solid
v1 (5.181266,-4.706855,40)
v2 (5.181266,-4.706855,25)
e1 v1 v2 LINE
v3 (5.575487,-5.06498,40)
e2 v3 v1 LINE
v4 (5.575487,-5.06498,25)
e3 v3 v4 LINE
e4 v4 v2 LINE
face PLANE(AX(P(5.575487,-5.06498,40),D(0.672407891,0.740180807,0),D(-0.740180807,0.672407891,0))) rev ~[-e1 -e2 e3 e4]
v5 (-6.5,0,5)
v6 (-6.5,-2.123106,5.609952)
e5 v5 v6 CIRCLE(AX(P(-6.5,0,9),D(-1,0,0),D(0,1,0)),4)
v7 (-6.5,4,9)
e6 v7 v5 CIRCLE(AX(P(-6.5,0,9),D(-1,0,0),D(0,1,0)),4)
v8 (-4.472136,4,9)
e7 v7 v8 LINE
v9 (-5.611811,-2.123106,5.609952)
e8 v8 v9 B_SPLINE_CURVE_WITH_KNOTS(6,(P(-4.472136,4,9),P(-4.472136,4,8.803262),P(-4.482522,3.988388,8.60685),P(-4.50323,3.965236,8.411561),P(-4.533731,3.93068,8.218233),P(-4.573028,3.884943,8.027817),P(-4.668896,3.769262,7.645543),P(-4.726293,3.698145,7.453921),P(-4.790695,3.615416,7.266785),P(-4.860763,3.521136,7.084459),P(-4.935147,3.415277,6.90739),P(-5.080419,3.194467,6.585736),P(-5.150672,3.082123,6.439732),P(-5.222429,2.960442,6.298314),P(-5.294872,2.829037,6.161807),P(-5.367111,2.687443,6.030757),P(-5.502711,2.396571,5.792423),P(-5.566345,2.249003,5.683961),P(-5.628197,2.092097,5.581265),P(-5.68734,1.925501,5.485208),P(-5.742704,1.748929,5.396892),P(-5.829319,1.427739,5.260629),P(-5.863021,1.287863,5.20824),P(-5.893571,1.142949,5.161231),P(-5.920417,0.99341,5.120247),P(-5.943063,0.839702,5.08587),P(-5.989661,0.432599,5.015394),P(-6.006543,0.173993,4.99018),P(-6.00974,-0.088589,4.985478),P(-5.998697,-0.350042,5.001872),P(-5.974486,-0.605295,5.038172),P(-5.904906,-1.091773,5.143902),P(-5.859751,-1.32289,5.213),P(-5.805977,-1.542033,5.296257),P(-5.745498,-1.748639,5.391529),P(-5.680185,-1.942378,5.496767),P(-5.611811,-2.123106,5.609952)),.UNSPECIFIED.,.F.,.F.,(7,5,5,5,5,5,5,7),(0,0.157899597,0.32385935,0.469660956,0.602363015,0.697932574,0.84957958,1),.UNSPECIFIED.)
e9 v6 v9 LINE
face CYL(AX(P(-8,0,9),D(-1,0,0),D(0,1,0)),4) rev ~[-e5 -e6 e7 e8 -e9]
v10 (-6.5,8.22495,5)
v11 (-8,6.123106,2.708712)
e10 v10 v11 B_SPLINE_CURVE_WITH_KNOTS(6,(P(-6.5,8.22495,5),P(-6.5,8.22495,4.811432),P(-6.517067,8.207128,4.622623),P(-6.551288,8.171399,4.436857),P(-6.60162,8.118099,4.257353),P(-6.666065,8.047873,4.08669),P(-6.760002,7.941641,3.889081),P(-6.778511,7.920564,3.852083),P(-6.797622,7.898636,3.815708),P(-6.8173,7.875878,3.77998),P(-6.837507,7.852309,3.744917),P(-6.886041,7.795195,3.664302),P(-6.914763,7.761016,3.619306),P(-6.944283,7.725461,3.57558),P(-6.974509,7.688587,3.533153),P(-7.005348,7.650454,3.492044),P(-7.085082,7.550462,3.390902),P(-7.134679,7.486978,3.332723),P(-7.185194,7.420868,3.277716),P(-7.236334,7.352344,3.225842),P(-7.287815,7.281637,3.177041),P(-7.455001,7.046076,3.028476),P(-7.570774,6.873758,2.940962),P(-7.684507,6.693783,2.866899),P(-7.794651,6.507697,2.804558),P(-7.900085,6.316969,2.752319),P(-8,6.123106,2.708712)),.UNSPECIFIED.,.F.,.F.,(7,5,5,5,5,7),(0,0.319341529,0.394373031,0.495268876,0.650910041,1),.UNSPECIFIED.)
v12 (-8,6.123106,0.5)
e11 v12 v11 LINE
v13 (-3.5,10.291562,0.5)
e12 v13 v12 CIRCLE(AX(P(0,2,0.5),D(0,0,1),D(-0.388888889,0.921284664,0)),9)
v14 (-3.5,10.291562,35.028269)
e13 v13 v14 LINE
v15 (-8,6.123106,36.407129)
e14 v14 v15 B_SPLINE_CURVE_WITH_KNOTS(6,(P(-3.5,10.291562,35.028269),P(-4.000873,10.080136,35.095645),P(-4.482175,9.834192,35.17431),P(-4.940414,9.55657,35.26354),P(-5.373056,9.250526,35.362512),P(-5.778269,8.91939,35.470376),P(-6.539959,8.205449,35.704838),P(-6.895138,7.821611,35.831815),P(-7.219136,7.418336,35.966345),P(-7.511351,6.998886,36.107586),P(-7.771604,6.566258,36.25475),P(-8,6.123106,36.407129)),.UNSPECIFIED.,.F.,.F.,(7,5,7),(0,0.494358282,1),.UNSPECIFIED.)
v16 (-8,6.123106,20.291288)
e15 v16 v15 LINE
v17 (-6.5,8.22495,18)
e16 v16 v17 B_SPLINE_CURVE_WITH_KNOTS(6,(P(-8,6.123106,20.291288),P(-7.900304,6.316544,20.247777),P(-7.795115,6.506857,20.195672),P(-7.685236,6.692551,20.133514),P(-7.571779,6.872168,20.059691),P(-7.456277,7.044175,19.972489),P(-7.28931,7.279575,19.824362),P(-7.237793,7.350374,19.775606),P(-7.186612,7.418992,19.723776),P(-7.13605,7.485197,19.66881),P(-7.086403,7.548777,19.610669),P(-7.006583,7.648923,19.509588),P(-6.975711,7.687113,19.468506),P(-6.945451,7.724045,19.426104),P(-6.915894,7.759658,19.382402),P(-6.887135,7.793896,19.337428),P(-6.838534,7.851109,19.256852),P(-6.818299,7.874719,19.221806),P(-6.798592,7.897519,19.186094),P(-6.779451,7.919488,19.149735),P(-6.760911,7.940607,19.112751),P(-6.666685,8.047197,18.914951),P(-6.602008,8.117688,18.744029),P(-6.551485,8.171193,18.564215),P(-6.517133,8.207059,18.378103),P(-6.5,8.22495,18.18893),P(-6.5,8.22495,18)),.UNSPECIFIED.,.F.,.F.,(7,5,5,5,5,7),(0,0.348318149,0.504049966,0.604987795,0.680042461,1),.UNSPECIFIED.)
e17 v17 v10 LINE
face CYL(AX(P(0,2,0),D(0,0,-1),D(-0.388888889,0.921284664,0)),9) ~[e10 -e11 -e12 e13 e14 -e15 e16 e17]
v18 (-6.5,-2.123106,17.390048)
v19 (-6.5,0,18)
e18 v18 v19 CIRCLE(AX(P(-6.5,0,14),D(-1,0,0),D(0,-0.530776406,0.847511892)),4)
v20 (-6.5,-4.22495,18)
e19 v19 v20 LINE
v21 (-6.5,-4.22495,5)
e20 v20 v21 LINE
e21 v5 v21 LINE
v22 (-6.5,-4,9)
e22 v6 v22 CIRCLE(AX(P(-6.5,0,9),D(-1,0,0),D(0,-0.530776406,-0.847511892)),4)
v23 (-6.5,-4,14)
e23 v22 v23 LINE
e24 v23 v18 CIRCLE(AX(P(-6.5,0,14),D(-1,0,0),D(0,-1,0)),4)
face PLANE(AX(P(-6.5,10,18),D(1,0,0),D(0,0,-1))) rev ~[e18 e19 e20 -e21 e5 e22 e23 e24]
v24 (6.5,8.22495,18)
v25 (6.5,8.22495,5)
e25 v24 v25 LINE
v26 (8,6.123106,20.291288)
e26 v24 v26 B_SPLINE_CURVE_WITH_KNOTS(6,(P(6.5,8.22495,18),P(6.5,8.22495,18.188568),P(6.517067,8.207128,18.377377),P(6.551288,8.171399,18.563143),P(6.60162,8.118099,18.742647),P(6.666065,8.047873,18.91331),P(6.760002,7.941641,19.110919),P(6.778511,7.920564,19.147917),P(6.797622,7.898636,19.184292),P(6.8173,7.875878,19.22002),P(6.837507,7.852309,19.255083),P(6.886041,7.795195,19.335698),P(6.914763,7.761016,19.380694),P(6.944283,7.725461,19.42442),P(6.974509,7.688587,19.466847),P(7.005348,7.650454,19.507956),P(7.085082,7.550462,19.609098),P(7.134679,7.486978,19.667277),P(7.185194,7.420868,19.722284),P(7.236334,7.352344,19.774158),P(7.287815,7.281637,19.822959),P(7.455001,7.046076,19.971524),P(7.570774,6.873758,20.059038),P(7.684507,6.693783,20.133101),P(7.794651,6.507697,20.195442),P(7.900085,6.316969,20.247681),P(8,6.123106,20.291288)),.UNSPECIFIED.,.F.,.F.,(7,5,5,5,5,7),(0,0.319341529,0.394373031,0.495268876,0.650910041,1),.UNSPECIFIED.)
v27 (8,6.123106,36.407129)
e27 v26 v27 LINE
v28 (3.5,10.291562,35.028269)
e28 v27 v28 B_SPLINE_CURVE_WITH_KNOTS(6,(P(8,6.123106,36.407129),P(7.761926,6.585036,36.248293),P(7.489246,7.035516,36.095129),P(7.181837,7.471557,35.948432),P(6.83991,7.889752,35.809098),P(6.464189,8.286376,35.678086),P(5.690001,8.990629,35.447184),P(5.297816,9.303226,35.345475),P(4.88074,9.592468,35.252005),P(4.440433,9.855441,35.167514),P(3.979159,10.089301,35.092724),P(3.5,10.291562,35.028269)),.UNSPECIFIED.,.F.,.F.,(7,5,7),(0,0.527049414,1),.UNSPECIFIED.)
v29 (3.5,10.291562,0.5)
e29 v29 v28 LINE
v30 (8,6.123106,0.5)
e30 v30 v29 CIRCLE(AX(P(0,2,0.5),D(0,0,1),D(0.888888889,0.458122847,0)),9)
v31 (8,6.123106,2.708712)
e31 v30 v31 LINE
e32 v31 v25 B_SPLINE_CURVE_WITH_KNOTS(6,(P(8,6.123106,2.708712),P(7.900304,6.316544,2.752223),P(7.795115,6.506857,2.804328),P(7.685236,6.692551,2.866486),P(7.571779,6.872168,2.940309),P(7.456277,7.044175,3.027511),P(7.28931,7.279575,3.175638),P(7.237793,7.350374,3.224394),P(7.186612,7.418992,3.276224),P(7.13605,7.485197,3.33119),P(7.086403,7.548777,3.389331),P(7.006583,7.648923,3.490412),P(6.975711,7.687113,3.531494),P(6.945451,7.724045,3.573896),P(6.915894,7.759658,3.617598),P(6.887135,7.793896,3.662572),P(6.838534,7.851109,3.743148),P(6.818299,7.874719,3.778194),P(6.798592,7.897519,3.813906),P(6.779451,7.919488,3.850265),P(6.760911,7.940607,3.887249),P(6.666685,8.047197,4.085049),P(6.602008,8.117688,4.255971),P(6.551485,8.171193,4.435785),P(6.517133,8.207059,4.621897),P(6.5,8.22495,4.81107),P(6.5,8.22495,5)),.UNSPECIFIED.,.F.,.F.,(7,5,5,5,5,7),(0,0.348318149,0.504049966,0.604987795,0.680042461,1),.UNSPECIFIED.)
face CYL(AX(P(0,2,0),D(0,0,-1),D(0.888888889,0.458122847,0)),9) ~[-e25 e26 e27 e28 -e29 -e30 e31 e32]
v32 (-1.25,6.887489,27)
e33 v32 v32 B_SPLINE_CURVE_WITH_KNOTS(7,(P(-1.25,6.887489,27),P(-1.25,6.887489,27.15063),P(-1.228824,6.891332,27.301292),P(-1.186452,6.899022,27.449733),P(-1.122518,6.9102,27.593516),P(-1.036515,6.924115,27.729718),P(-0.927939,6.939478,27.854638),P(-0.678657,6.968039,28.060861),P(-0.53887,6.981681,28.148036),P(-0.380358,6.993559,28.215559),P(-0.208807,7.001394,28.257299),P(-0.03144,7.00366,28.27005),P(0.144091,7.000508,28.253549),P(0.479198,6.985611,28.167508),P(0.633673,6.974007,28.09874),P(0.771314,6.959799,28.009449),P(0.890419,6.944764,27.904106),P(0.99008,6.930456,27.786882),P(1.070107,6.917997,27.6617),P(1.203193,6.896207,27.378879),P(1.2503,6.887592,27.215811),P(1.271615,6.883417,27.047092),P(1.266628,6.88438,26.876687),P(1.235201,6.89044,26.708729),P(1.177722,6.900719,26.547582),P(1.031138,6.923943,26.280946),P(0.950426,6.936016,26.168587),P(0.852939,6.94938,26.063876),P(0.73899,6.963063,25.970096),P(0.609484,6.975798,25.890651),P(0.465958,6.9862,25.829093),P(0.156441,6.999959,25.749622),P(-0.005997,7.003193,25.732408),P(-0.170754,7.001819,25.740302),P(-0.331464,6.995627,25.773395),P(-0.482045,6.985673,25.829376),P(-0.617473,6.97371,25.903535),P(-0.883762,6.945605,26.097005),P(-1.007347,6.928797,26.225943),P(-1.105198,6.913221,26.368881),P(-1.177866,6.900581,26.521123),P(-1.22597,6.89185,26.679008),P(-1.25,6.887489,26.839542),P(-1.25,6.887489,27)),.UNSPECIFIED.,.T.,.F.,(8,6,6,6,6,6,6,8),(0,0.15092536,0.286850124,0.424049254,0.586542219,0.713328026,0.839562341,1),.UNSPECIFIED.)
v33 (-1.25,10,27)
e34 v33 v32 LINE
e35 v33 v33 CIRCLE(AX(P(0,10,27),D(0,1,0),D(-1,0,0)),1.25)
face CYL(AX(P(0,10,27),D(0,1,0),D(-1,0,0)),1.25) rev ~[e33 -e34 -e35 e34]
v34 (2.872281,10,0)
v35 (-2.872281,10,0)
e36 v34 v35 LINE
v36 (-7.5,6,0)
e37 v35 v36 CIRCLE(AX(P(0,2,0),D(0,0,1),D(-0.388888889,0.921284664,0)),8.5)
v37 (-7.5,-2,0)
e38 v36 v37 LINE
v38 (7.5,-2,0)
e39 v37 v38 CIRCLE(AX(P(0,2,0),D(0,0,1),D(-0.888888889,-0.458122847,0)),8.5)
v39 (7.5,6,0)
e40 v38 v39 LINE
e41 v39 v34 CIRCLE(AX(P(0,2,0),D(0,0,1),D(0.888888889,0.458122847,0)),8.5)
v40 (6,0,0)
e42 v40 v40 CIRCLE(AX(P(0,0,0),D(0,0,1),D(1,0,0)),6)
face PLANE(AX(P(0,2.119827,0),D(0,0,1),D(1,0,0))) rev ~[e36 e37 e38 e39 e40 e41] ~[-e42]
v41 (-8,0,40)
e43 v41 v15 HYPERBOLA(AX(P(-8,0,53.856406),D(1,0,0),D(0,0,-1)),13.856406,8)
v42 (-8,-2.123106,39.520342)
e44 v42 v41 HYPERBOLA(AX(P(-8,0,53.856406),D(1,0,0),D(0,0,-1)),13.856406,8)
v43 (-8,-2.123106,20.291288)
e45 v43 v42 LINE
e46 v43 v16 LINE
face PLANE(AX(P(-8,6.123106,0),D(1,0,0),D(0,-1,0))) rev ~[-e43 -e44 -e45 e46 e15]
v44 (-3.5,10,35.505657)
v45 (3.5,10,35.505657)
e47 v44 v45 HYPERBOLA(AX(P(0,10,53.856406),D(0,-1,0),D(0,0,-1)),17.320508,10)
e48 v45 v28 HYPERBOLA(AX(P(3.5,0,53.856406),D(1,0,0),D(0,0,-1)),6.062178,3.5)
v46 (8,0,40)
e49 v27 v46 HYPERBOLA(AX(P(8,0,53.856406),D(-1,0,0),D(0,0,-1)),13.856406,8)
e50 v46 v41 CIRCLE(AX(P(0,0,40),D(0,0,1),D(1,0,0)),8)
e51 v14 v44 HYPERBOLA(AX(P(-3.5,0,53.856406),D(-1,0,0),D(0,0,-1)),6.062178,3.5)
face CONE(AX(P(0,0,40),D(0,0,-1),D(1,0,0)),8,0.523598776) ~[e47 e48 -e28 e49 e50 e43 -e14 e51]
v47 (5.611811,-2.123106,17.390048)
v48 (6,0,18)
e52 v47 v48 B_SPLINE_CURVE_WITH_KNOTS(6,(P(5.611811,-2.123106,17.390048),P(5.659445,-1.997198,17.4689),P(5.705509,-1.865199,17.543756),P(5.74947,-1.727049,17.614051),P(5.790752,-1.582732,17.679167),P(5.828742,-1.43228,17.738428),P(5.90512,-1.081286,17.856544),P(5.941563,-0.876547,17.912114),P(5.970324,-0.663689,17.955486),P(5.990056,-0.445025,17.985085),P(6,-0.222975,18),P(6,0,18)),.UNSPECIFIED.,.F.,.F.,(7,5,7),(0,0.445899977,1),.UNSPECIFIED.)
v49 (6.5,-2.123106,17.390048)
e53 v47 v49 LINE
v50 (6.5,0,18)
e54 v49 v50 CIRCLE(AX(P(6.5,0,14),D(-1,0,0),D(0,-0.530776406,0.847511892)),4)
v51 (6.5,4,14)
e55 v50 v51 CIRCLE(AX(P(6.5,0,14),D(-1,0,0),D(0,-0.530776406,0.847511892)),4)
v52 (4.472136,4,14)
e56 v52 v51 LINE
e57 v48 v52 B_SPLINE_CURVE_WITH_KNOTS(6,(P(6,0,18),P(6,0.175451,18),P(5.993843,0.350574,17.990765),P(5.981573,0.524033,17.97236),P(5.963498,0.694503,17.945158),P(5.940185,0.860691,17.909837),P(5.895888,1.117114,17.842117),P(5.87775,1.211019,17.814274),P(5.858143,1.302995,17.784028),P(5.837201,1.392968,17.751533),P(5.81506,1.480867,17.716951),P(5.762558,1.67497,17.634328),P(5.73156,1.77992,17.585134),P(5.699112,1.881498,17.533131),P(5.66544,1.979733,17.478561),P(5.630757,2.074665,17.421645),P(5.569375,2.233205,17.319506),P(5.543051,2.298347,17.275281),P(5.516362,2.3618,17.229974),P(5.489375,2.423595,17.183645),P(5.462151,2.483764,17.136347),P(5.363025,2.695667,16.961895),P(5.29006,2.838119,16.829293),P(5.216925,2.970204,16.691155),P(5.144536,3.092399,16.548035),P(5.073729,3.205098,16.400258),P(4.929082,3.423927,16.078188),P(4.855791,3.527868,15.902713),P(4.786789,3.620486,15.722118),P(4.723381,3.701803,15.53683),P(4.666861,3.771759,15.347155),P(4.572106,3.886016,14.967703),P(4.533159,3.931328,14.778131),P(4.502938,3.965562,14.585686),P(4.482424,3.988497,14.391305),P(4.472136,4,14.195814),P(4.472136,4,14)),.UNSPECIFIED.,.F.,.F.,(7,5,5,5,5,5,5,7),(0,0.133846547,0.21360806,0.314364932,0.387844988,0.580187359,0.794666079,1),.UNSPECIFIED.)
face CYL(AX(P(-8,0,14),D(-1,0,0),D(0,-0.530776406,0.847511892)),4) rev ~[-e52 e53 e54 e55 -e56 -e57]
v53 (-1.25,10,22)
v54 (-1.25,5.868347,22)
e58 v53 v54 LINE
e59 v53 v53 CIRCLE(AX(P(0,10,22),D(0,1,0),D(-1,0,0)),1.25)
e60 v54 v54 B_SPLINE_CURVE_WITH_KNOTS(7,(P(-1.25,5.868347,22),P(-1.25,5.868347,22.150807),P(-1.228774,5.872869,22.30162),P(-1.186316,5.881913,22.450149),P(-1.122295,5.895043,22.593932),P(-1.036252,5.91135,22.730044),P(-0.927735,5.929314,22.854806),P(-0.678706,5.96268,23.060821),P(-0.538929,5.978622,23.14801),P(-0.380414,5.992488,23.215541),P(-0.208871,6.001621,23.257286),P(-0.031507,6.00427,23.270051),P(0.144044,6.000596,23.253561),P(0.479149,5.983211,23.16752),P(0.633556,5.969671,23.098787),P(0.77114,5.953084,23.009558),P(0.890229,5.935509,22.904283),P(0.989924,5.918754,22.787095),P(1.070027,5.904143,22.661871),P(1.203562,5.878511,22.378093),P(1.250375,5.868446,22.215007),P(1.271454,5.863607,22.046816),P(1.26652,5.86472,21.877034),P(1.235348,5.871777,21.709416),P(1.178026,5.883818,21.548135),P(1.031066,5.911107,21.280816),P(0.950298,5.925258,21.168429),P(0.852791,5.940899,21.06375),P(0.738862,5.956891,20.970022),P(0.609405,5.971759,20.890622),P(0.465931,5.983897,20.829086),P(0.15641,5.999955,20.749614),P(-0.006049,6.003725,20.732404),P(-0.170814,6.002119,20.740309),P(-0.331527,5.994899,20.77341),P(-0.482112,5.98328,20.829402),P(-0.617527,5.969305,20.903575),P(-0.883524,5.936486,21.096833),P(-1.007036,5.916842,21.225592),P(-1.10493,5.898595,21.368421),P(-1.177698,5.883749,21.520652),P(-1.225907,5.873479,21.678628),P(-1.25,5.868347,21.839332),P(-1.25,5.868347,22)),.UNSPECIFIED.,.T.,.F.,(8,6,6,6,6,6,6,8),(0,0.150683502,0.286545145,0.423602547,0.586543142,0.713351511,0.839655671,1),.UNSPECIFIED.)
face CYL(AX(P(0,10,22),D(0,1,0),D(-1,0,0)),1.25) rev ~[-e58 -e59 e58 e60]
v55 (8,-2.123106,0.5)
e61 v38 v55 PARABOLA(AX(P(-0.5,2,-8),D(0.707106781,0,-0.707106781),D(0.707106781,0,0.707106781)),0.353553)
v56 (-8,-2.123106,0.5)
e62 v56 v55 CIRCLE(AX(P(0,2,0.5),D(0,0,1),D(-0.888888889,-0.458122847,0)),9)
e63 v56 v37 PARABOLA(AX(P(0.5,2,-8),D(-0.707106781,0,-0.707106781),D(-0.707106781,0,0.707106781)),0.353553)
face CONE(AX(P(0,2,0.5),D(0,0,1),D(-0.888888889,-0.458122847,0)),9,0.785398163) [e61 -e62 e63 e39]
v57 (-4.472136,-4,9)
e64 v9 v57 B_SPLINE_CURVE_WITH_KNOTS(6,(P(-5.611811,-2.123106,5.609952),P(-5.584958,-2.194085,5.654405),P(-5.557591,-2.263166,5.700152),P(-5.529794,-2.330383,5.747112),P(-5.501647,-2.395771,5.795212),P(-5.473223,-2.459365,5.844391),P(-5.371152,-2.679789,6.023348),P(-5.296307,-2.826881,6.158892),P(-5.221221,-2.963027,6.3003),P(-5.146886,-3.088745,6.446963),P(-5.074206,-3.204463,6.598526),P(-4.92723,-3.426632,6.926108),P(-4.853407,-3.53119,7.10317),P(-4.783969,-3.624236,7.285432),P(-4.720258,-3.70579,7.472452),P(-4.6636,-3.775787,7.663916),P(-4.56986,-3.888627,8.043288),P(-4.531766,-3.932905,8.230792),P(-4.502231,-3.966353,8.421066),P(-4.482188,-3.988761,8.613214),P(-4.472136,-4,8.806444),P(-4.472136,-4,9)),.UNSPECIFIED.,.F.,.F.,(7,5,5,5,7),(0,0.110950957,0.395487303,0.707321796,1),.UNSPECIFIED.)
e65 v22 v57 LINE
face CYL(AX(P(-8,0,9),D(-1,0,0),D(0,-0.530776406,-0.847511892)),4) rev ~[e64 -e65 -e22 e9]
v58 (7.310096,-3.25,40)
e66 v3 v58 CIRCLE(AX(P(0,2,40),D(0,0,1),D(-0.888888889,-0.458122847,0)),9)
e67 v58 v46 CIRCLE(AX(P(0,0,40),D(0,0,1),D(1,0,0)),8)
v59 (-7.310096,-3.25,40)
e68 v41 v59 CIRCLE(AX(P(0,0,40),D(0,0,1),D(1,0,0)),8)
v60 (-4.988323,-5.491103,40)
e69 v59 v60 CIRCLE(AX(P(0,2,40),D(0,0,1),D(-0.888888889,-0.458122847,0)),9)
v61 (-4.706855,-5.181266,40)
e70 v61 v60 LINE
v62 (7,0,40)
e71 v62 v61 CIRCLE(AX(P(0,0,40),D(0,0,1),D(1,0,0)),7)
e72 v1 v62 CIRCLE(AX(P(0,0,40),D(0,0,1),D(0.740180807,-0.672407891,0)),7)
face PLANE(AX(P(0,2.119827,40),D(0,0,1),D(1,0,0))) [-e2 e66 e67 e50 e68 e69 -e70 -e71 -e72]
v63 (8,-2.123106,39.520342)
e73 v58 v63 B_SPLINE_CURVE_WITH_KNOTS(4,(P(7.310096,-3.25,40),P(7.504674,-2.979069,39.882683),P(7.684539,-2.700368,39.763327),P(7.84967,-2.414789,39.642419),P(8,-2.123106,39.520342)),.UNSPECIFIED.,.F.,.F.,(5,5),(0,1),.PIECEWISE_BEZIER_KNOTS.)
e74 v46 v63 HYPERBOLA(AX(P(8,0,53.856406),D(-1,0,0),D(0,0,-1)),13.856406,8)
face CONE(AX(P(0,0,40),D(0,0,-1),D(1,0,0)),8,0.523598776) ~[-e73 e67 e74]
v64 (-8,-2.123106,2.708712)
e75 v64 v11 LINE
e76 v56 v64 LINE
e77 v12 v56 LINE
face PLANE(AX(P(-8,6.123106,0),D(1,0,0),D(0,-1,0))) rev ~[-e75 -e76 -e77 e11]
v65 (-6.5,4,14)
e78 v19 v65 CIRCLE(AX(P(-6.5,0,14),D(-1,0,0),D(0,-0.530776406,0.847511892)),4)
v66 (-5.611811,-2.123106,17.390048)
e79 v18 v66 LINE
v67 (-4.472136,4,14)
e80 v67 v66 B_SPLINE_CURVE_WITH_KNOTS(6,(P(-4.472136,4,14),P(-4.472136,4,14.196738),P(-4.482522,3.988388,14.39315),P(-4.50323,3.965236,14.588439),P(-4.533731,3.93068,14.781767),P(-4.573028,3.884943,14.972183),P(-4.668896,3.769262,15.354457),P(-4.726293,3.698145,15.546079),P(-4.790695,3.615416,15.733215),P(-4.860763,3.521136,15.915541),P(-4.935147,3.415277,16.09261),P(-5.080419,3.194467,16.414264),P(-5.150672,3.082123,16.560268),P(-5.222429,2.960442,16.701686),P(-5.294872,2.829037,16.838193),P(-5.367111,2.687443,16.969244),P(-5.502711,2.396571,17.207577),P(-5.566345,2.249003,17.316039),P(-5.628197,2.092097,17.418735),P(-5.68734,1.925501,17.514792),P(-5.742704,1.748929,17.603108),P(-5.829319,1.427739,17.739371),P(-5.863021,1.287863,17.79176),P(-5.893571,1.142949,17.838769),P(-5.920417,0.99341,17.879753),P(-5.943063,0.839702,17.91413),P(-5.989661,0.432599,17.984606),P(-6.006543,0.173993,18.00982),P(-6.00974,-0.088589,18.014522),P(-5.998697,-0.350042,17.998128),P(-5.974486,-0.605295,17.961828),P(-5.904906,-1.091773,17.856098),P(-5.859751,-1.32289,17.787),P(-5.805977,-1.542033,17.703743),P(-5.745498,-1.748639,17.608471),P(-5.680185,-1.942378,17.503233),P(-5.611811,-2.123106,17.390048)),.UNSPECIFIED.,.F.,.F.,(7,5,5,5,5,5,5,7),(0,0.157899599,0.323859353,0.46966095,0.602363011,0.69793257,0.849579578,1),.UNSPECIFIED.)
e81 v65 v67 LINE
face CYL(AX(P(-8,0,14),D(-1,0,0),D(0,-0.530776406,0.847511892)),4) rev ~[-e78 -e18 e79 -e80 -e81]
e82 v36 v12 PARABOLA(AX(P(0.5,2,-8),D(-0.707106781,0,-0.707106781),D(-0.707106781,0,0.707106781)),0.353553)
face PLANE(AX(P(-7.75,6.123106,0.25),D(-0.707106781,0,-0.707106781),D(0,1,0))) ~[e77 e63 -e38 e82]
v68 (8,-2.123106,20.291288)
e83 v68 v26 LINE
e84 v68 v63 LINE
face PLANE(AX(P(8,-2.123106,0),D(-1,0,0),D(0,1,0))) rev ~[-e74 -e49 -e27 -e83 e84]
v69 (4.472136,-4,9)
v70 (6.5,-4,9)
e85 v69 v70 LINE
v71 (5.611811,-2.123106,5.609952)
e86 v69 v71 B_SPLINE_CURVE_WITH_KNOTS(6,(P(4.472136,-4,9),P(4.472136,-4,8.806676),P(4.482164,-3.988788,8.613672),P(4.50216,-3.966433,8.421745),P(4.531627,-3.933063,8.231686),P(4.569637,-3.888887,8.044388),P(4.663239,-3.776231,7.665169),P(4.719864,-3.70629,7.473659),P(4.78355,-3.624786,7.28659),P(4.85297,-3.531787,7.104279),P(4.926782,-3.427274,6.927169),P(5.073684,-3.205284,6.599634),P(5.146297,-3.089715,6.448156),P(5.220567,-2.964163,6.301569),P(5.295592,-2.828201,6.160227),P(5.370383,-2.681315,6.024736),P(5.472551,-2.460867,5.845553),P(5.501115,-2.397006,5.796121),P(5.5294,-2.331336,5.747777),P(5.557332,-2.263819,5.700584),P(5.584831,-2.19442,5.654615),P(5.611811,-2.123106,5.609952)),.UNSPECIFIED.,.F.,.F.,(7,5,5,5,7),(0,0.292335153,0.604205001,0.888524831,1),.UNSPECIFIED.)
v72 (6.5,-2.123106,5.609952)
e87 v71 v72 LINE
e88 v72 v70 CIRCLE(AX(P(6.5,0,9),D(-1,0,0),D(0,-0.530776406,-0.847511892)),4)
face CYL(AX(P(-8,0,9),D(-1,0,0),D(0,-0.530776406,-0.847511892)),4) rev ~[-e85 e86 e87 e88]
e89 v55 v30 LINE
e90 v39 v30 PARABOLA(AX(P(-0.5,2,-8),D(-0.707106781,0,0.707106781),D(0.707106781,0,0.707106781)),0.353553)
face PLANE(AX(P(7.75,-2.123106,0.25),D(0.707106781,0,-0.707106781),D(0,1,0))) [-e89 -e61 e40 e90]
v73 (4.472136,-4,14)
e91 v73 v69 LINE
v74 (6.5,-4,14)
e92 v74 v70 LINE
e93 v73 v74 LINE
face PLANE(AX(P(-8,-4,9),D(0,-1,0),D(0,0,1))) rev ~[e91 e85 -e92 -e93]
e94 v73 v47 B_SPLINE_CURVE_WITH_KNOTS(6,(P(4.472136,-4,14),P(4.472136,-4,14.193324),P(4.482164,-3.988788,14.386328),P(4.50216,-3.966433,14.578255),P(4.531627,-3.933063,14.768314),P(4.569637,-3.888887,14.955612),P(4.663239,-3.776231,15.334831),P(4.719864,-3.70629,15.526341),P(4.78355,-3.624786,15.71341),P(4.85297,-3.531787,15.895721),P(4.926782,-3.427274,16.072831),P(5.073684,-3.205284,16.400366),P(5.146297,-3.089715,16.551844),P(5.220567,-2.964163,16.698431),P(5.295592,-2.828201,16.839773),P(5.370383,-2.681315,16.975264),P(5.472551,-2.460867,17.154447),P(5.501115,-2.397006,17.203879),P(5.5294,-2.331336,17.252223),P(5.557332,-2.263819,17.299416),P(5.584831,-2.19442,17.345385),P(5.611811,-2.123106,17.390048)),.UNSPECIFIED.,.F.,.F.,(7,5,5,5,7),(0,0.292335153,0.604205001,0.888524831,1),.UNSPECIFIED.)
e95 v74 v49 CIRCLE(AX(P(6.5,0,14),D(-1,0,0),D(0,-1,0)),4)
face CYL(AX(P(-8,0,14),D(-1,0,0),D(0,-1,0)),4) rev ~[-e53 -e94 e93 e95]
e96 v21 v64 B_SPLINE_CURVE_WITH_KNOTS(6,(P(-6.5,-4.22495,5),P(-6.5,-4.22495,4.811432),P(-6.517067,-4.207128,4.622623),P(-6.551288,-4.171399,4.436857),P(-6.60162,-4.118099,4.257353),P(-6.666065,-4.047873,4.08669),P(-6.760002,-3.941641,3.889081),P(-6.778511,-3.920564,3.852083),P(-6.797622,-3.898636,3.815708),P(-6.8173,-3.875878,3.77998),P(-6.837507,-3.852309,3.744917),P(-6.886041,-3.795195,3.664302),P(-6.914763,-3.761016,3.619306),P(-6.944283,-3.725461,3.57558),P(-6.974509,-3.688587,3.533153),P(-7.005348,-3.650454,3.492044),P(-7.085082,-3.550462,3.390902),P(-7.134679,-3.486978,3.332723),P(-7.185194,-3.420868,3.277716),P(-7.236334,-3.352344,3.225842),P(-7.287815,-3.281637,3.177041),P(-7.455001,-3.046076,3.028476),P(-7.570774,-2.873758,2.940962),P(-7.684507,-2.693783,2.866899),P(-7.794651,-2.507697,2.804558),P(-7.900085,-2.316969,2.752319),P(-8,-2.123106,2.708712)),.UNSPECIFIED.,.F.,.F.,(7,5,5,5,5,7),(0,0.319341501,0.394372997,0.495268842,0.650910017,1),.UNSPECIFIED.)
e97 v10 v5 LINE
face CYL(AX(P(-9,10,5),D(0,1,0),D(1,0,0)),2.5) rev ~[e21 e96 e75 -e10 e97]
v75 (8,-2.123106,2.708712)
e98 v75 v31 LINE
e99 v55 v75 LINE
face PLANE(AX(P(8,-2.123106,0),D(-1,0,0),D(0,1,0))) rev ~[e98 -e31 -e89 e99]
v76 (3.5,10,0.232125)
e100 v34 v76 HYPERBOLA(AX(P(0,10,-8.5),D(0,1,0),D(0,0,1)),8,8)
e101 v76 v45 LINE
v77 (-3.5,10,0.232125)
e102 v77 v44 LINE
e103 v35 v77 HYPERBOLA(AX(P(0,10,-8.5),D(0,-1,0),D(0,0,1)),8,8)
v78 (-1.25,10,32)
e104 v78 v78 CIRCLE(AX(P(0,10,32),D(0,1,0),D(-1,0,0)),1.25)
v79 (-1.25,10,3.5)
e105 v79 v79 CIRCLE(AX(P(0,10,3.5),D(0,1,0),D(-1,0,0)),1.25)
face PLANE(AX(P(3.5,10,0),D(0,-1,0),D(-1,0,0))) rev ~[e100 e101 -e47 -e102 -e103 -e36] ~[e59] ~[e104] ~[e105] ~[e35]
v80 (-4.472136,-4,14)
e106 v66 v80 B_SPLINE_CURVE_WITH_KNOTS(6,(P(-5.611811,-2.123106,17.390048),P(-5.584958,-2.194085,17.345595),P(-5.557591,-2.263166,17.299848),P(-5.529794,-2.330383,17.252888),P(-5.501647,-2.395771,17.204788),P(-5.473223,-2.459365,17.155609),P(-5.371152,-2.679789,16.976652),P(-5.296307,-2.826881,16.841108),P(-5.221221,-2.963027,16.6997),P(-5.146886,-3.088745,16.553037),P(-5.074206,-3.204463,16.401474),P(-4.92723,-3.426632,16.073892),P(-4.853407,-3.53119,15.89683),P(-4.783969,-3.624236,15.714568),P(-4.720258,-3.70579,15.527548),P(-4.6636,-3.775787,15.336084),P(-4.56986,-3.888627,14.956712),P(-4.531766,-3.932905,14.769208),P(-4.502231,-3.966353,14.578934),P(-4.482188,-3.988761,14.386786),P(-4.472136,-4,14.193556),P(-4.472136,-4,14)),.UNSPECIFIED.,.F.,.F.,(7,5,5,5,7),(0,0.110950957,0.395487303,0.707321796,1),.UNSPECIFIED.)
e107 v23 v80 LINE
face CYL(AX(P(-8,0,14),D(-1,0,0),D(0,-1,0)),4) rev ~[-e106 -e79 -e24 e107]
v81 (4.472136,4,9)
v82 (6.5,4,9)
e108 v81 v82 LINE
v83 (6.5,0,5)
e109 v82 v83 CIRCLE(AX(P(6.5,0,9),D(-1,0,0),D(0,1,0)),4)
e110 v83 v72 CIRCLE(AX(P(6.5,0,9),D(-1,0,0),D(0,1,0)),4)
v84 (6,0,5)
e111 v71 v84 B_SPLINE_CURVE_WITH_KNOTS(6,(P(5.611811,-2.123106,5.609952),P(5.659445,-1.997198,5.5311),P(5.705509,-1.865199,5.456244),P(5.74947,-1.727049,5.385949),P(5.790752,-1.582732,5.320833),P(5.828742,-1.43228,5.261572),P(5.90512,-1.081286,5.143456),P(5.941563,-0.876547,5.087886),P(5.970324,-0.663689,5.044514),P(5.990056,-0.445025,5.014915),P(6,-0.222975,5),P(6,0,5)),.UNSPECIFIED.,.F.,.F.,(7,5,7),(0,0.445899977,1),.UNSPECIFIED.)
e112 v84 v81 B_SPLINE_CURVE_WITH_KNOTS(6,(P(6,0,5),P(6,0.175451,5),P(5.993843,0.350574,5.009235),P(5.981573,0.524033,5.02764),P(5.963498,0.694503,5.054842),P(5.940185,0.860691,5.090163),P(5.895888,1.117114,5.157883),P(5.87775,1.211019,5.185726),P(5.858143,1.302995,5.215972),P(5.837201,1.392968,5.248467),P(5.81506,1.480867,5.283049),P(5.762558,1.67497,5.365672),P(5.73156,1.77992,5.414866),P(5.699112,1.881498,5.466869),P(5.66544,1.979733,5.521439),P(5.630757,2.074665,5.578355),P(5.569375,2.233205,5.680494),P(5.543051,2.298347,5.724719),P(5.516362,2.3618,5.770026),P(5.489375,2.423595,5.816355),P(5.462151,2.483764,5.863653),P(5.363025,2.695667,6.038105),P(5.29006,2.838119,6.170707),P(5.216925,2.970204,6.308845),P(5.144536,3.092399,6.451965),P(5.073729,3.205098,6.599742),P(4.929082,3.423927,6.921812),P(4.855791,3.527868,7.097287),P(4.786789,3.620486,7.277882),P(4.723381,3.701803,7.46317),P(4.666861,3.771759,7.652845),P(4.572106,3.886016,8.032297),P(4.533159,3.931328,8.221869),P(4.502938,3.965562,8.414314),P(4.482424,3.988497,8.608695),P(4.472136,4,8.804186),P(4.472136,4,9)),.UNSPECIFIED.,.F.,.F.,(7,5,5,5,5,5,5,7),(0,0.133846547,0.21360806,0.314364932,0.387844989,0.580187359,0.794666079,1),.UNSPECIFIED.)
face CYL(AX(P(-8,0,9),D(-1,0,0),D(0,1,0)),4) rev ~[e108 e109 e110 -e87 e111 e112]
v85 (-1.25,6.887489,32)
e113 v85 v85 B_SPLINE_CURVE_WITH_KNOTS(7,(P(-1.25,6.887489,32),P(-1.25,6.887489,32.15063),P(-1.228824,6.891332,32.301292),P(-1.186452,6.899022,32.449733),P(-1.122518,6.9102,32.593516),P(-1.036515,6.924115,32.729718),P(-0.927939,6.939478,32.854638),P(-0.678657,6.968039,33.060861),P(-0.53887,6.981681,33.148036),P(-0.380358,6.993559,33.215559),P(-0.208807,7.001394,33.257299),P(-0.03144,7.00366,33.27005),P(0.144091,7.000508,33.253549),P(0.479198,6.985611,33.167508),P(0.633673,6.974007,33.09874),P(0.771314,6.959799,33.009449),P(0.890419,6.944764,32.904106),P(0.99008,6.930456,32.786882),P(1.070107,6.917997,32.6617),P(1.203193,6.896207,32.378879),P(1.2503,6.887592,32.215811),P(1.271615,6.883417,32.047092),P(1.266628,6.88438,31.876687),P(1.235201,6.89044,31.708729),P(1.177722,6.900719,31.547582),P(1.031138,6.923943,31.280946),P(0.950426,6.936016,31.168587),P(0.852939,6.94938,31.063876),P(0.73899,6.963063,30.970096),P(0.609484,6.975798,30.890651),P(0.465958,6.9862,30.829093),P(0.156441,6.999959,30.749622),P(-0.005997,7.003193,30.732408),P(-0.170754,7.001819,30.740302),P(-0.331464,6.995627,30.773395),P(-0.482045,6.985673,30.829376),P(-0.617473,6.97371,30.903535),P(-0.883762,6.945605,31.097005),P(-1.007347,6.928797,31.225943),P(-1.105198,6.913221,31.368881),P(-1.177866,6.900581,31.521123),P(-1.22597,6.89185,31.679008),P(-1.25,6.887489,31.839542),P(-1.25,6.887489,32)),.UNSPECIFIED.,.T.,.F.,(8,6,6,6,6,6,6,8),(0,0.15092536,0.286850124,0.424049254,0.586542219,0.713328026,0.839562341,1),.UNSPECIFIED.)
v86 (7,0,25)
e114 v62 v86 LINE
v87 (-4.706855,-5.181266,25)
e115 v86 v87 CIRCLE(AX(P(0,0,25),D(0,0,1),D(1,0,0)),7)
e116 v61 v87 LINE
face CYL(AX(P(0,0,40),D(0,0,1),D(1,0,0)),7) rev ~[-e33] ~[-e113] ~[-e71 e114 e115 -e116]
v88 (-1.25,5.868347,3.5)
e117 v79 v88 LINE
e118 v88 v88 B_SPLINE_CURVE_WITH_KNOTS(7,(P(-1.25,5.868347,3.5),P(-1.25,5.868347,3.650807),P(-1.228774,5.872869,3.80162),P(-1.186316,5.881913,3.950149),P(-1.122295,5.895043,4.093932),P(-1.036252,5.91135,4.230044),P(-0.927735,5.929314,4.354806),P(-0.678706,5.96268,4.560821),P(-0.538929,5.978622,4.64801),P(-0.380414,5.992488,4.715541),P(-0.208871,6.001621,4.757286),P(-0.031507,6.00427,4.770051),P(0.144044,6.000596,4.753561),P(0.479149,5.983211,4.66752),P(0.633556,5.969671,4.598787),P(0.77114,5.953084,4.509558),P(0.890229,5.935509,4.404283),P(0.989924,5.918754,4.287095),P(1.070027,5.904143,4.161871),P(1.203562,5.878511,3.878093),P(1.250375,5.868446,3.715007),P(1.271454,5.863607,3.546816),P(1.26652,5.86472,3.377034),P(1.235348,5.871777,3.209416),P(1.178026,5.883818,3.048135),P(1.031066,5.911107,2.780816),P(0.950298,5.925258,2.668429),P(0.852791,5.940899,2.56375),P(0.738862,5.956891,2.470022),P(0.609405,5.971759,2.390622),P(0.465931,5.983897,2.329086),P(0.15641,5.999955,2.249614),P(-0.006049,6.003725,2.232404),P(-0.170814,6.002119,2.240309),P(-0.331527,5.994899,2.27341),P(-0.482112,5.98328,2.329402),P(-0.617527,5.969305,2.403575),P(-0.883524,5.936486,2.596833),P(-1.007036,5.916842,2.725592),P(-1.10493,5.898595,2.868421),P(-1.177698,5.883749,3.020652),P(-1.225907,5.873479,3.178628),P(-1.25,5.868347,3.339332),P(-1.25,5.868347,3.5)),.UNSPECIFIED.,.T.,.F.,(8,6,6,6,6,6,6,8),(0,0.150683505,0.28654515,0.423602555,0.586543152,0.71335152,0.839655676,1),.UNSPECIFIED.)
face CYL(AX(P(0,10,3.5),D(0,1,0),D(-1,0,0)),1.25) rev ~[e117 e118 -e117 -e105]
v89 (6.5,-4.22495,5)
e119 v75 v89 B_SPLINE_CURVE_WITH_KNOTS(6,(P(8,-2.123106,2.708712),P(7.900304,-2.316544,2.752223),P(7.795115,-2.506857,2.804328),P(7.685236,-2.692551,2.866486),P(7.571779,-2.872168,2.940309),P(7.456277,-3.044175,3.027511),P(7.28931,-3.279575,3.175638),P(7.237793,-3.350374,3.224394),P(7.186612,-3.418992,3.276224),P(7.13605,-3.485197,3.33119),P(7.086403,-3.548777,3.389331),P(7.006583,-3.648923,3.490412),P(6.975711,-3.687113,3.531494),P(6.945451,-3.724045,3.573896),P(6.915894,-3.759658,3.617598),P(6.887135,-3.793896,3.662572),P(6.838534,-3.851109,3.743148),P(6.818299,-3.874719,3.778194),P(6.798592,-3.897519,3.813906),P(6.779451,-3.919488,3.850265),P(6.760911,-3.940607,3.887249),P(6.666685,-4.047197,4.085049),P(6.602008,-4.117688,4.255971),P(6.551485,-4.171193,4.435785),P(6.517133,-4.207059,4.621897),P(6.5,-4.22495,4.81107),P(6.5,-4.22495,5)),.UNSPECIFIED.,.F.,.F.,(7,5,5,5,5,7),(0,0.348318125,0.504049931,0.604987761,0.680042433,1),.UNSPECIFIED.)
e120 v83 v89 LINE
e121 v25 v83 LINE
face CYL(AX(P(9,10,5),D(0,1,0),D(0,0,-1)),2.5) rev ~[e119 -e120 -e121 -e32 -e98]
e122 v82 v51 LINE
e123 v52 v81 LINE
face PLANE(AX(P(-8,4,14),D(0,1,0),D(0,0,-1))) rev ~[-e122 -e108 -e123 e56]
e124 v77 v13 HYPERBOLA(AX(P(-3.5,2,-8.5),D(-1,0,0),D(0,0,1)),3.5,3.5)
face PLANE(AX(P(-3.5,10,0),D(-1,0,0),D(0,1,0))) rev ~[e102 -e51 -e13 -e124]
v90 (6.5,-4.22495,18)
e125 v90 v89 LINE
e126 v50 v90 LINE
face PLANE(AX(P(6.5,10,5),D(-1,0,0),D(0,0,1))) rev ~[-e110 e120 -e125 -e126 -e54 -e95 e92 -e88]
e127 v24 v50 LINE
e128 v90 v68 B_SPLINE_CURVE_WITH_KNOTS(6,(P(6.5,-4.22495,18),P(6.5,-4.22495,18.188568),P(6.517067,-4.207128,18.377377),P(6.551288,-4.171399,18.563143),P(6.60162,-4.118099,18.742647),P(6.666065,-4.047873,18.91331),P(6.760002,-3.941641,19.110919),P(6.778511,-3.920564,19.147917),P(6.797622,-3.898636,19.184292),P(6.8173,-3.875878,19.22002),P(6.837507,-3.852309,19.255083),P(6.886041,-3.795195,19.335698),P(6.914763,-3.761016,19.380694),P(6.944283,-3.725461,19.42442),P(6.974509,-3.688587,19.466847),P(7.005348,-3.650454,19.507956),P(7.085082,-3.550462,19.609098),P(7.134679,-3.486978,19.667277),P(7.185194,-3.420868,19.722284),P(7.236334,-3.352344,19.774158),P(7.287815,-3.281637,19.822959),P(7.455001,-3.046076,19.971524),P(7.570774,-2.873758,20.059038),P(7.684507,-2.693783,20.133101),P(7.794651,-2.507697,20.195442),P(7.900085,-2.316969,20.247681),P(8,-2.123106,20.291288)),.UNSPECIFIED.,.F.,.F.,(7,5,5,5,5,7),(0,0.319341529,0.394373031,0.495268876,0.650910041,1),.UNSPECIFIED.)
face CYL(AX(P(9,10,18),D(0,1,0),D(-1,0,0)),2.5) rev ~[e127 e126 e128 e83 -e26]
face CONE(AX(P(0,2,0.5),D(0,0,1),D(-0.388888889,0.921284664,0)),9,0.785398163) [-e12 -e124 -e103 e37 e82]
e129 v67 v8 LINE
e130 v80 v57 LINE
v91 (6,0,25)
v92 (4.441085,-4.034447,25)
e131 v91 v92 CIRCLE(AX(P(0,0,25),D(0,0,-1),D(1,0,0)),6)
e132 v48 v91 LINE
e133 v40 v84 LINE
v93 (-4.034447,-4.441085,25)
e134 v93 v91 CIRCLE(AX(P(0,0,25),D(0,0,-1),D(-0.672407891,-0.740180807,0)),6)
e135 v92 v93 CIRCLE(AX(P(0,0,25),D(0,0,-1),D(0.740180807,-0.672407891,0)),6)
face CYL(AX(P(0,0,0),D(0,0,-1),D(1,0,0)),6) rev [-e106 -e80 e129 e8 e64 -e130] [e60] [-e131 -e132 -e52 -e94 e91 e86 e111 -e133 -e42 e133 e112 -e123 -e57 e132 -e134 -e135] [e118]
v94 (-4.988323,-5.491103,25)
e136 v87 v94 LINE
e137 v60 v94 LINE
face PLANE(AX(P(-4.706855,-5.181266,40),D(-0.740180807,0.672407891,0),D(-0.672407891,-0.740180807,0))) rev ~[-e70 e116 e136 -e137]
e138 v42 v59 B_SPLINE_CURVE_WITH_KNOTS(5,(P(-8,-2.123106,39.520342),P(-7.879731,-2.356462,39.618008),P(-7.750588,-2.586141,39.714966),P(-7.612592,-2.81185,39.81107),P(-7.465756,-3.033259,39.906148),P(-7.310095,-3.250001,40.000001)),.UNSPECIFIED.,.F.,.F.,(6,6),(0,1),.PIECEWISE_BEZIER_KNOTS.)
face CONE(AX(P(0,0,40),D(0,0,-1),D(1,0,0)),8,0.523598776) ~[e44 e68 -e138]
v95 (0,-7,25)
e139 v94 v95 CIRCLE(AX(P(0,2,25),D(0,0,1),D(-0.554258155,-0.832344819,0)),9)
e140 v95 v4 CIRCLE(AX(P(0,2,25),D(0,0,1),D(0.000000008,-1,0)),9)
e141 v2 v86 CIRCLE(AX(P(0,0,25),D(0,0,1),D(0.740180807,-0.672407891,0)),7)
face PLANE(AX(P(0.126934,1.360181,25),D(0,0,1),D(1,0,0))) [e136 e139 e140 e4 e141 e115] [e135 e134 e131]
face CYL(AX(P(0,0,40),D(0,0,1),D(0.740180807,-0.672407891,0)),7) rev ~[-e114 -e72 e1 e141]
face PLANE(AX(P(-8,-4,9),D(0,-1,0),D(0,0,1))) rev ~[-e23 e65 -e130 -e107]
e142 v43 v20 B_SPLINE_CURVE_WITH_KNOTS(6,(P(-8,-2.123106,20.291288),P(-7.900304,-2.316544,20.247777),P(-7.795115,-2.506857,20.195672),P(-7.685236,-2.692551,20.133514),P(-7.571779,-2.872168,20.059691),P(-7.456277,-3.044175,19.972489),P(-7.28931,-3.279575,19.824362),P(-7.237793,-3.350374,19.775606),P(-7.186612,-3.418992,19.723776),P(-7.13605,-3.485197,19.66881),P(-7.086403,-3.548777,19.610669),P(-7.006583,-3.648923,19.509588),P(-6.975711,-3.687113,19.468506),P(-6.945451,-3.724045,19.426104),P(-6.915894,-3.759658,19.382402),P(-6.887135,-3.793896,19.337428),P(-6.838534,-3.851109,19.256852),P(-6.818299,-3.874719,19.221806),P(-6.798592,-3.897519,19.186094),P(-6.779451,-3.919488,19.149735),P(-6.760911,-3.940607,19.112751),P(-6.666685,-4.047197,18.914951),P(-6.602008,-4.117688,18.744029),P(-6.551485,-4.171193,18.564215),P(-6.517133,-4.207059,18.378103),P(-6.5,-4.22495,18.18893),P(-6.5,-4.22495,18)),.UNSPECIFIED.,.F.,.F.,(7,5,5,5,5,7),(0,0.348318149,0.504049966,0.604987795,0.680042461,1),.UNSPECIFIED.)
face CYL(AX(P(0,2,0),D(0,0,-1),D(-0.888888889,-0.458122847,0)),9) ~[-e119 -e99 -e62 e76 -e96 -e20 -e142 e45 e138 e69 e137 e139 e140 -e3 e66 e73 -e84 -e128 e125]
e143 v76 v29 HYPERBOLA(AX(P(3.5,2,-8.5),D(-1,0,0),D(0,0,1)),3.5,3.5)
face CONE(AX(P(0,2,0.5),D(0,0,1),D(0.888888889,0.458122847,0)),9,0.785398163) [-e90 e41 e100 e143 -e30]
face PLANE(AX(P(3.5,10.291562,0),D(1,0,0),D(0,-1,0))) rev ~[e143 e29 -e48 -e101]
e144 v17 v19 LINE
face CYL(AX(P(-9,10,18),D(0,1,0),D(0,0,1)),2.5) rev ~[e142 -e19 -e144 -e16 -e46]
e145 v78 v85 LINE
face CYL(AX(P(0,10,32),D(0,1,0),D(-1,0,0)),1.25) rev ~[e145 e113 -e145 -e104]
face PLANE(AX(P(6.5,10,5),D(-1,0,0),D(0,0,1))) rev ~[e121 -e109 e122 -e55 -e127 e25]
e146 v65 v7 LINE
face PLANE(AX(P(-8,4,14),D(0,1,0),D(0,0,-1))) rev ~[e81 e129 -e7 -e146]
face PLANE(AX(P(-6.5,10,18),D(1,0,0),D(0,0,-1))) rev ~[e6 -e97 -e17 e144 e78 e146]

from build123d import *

# Parameters (mm, degrees)
F0_R      = 6
F1_DEPTH  = 40
F3_DEPTH  = 15
F6_SIZE   = 0.5
F8_DEPTH  = 16.0010001
F9_R      = 1.25
F10_DEPTH = 4.1326528028
F11_DEPTH = 15


# Not quite as in the source:
# - a feature names something its author has since deleted; it is built from what else it names


with BuildPart() as f1:
    # F0 (on Top) → F1 (new body)
    with BuildSketch(Plane.XY):
        with BuildLine():
            Line((-8, 6.1231056256), (-8, -2.1231056256))
            ThreePointArc((-8, -2.1231056256), (0, -7), (8, -2.1231056256))
            Line((8, -2.1231056256), (8, 6.1231056256))
            ThreePointArc((8, 6.1231056256), (6.1160859286, 8.6025368544), (3.5, 10.2915619759))
            Line((3.5, 10.2915619759), (3.5, 10))
            Line((3.5, 10), (-3.5, 10))
            Line((-3.5, 10), (-3.5, 10.2915619759))
            ThreePointArc((-3.5, 10.2915619759), (-6.1160859286, 8.6025368544), (-8, 6.1231056256))
        make_face()
        Circle(F0_R, mode=Mode.SUBTRACT)
    extrude(amount=F1_DEPTH)

    # F2 (on face) → F3 (cut)
    with BuildSketch(Plane.XY.offset(40)):
        with BuildLine():
            ThreePointArc((5.1812656518, -4.7068552395), (6.5295045586, -2.5230081686), (7, 0))
            ThreePointArc((7, 0), (-2.8330207662, 6.4010931362), (-4.7068552395, -5.1812656518))
            Line((-4.7068552395, -5.1812656518), (-4.0344473482, -4.4410848444))
            ThreePointArc((-4.0344473482, -4.4410848444), (-2.4283035139, 5.4866512596), (6, 0))
            ThreePointArc((6, 0), (5.5967181931, -2.1625784302), (4.4410848444, -4.0344473482))
            Line((4.4410848444, -4.0344473482), (5.1812656518, -4.7068552395))
        make_face()
        with BuildLine():
            Line((-4.0344473482, -4.4410848444), (-4.7068552395, -5.1812656518))
            ThreePointArc((-4.7068552395, -5.1812656518), (-2.523008134, -6.529504572), (7.42e-08, -7))
            ThreePointArc((7.42e-08, -7), (2.8330208001, -6.4010931212), (5.1812656518, -4.7068552395))
            Line((5.1812656518, -4.7068552395), (4.4410848444, -4.0344473482))
            ThreePointArc((4.4410848444, -4.0344473482), (0.2875361311, -5.9931062875), (-4.0344473482, -4.4410848444))
        make_face()
        with BuildLine():
            ThreePointArc((7.42e-08, -7), (-2.523008134, -6.529504572), (-4.7068552395, -5.1812656518))
            Line((-4.7068552395, -5.1812656518), (-4.9883233954, -5.4911033702))
            ThreePointArc((-4.9883233954, -5.4911033702), (-2.6057694927, -6.6145206106), (7.42e-08, -7))
        make_face()
        with BuildLine():
            Line((5.5754867215, -5.0649803835), (5.1812656518, -4.7068552395))
            ThreePointArc((5.1812656518, -4.7068552395), (2.8330208001, -6.4010931212), (7.42e-08, -7))
            ThreePointArc((7.42e-08, -7), (2.9508623284, -6.5024944292), (5.5754867215, -5.0649803835))
        make_face()
    extrude(amount=-F3_DEPTH, mode=Mode.SUBTRACT)

    # F4 (on Front) → F5 (revolve, cut)
    with BuildSketch(Plane.XZ):
        Polygon((0, 44.0566428006), (8, 40), (14.6664504582, 28.4533691002), (14.6664504582, 47.2484640777), (0, 47.2484640777), align=None)
    revolve(axis=Axis((0, 0, 27), (0, 0, 1)), mode=Mode.SUBTRACT)

    # F6
    f6_edges = [f1.edges().sort_by_distance(p)[0] for p in [
        (6.116086, 8.602537, 0),
        (-6.116086, 8.602537, 0),
        (-8, 2, 0),
        (0, -7, 0),
        (8, 2, 0),
    ]]
    chamfer(f6_edges, length=F6_SIZE)

    # F7 (on face) → F8 (cut, through all)
    with BuildSketch(Plane(origin=(-8, 0, 0), x_dir=(0, -1, 0), z_dir=(-1, 0, 0))):
        with BuildLine():
            ThreePointArc((2.1231056256, 5.6099524336), (3.4994587083, 7.0625303231), (4, 9))
            ThreePointArc((4, 9), (3.7742546282, 10.3247648854), (3.1224989992, 11.5))
            ThreePointArc((3.1224989992, 11.5), (2.6602891079, 11.0128840226), (2.1231056256, 10.6099524336))
            Line((2.1231056256, 10.6099524336), (2.1231056256, 5.6099524336))
        make_face()
        with BuildLine():
            ThreePointArc((3.1224989992, 11.5), (3.7742546282, 10.3247648854), (4, 9))
            Line((4, 9), (4, 14))
            ThreePointArc((4, 14), (3.7742546282, 12.6752351146), (3.1224989992, 11.5))
        make_face()
        with BuildLine():
            ThreePointArc((2.1231056256, 10.6099524336), (2.6602891079, 11.0128840226), (3.1224989992, 11.5))
            ThreePointArc((3.1224989992, 11.5), (2.6602891079, 11.9871159774), (2.1231056256, 12.3900475664))
            Line((2.1231056256, 12.3900475664), (2.1231056256, 10.6099524336))
        make_face()
        with BuildLine():
            ThreePointArc((2.1231056256, 12.3900475664), (2.6602891079, 11.9871159774), (3.1224989992, 11.5))
            ThreePointArc((3.1224989992, 11.5), (3.7742546282, 12.6752351146), (4, 14))
            ThreePointArc((4, 14), (3.4994587083, 15.9374696769), (2.1231056256, 17.3900475664))
            Line((2.1231056256, 17.3900475664), (2.1231056256, 12.3900475664))
        make_face()
        with BuildLine():
            ThreePointArc((-4, 9), (-1.9374696769, 5.5005412917), (2.1231056256, 5.6099524336))
            Line((2.1231056256, 5.6099524336), (2.1231056256, 10.6099524336))
            ThreePointArc((2.1231056256, 10.6099524336), (-0.66913597, 10.0563649949), (-3.1224989992, 11.5))
            ThreePointArc((-3.1224989992, 11.5), (-3.7742546282, 10.3247648854), (-4, 9))
        make_face()
        with BuildLine():
            Line((2.1231056256, 10.6099524336), (2.1231056256, 12.3900475664))
            ThreePointArc((2.1231056256, 12.3900475664), (-0.66913597, 12.9436350051), (-3.1224989992, 11.5))
            ThreePointArc((-3.1224989992, 11.5), (-0.66913597, 10.0563649949), (2.1231056256, 10.6099524336))
        make_face()
        with BuildLine():
            ThreePointArc((-3.1224989992, 11.5), (-0.66913597, 12.9436350051), (2.1231056256, 12.3900475664))
            Line((2.1231056256, 12.3900475664), (2.1231056256, 17.3900475664))
            ThreePointArc((2.1231056256, 17.3900475664), (-1.9374696769, 17.4994587083), (-4, 14))
            ThreePointArc((-4, 14), (-3.7742546282, 12.6752351146), (-3.1224989992, 11.5))
        make_face()
        with BuildLine():
            Line((-4, 14), (-4, 9))
            ThreePointArc((-4, 9), (-3.7742546282, 10.3247648854), (-3.1224989992, 11.5))
            ThreePointArc((-3.1224989992, 11.5), (-3.7742546282, 12.6752351146), (-4, 14))
        make_face()
    extrude(amount=-F8_DEPTH, mode=Mode.SUBTRACT)

    # F9 (on face) → F10 (cut, through all)
    with BuildSketch(Plane(origin=(0, 10, 0), x_dir=(-1, 0, 0), z_dir=(0, 1, 0))):
        with Locations((0, 3.5)):
            Circle(F9_R)
        with Locations((0, 22)):
            Circle(F9_R)
        with Locations((0, 27)):
            Circle(F9_R)
        with Locations((0, 32)):
            Circle(F9_R)
    extrude(amount=-F10_DEPTH, mode=Mode.SUBTRACT)

    # F9 (on face) → F11 (cut)
    with BuildSketch(Plane(origin=(0, 10, 0), x_dir=(-1, 0, 0), z_dir=(0, 1, 0))):
        with BuildLine():
            ThreePointArc((-6.5, 18), (-7.232233047, 19.767766953), (-9, 20.5))
            Line((-9, 20.5), (-9.5, 20.5))
            Line((-9.5, 20.5), (-9.5, 2.5))
            Line((-9.5, 2.5), (-9, 2.5))
            ThreePointArc((-9, 2.5), (-7.232233047, 3.232233047), (-6.5, 5))
            Line((-6.5, 5), (-6.5, 18))
        make_face()
        with BuildLine():
            Line((10.5, 20.5), (9, 20.5))
            ThreePointArc((9, 20.5), (7.232233047, 19.767766953), (6.5, 18))
            Line((6.5, 18), (6.5, 5))
            ThreePointArc((6.5, 5), (7.232233047, 3.232233047), (9, 2.5))
            Line((9, 2.5), (10.5, 2.5))
            Line((10.5, 2.5), (10.5, 20.5))
        make_face()
    extrude(amount=-F11_DEPTH, mode=Mode.SUBTRACT)


solid = f1.part
